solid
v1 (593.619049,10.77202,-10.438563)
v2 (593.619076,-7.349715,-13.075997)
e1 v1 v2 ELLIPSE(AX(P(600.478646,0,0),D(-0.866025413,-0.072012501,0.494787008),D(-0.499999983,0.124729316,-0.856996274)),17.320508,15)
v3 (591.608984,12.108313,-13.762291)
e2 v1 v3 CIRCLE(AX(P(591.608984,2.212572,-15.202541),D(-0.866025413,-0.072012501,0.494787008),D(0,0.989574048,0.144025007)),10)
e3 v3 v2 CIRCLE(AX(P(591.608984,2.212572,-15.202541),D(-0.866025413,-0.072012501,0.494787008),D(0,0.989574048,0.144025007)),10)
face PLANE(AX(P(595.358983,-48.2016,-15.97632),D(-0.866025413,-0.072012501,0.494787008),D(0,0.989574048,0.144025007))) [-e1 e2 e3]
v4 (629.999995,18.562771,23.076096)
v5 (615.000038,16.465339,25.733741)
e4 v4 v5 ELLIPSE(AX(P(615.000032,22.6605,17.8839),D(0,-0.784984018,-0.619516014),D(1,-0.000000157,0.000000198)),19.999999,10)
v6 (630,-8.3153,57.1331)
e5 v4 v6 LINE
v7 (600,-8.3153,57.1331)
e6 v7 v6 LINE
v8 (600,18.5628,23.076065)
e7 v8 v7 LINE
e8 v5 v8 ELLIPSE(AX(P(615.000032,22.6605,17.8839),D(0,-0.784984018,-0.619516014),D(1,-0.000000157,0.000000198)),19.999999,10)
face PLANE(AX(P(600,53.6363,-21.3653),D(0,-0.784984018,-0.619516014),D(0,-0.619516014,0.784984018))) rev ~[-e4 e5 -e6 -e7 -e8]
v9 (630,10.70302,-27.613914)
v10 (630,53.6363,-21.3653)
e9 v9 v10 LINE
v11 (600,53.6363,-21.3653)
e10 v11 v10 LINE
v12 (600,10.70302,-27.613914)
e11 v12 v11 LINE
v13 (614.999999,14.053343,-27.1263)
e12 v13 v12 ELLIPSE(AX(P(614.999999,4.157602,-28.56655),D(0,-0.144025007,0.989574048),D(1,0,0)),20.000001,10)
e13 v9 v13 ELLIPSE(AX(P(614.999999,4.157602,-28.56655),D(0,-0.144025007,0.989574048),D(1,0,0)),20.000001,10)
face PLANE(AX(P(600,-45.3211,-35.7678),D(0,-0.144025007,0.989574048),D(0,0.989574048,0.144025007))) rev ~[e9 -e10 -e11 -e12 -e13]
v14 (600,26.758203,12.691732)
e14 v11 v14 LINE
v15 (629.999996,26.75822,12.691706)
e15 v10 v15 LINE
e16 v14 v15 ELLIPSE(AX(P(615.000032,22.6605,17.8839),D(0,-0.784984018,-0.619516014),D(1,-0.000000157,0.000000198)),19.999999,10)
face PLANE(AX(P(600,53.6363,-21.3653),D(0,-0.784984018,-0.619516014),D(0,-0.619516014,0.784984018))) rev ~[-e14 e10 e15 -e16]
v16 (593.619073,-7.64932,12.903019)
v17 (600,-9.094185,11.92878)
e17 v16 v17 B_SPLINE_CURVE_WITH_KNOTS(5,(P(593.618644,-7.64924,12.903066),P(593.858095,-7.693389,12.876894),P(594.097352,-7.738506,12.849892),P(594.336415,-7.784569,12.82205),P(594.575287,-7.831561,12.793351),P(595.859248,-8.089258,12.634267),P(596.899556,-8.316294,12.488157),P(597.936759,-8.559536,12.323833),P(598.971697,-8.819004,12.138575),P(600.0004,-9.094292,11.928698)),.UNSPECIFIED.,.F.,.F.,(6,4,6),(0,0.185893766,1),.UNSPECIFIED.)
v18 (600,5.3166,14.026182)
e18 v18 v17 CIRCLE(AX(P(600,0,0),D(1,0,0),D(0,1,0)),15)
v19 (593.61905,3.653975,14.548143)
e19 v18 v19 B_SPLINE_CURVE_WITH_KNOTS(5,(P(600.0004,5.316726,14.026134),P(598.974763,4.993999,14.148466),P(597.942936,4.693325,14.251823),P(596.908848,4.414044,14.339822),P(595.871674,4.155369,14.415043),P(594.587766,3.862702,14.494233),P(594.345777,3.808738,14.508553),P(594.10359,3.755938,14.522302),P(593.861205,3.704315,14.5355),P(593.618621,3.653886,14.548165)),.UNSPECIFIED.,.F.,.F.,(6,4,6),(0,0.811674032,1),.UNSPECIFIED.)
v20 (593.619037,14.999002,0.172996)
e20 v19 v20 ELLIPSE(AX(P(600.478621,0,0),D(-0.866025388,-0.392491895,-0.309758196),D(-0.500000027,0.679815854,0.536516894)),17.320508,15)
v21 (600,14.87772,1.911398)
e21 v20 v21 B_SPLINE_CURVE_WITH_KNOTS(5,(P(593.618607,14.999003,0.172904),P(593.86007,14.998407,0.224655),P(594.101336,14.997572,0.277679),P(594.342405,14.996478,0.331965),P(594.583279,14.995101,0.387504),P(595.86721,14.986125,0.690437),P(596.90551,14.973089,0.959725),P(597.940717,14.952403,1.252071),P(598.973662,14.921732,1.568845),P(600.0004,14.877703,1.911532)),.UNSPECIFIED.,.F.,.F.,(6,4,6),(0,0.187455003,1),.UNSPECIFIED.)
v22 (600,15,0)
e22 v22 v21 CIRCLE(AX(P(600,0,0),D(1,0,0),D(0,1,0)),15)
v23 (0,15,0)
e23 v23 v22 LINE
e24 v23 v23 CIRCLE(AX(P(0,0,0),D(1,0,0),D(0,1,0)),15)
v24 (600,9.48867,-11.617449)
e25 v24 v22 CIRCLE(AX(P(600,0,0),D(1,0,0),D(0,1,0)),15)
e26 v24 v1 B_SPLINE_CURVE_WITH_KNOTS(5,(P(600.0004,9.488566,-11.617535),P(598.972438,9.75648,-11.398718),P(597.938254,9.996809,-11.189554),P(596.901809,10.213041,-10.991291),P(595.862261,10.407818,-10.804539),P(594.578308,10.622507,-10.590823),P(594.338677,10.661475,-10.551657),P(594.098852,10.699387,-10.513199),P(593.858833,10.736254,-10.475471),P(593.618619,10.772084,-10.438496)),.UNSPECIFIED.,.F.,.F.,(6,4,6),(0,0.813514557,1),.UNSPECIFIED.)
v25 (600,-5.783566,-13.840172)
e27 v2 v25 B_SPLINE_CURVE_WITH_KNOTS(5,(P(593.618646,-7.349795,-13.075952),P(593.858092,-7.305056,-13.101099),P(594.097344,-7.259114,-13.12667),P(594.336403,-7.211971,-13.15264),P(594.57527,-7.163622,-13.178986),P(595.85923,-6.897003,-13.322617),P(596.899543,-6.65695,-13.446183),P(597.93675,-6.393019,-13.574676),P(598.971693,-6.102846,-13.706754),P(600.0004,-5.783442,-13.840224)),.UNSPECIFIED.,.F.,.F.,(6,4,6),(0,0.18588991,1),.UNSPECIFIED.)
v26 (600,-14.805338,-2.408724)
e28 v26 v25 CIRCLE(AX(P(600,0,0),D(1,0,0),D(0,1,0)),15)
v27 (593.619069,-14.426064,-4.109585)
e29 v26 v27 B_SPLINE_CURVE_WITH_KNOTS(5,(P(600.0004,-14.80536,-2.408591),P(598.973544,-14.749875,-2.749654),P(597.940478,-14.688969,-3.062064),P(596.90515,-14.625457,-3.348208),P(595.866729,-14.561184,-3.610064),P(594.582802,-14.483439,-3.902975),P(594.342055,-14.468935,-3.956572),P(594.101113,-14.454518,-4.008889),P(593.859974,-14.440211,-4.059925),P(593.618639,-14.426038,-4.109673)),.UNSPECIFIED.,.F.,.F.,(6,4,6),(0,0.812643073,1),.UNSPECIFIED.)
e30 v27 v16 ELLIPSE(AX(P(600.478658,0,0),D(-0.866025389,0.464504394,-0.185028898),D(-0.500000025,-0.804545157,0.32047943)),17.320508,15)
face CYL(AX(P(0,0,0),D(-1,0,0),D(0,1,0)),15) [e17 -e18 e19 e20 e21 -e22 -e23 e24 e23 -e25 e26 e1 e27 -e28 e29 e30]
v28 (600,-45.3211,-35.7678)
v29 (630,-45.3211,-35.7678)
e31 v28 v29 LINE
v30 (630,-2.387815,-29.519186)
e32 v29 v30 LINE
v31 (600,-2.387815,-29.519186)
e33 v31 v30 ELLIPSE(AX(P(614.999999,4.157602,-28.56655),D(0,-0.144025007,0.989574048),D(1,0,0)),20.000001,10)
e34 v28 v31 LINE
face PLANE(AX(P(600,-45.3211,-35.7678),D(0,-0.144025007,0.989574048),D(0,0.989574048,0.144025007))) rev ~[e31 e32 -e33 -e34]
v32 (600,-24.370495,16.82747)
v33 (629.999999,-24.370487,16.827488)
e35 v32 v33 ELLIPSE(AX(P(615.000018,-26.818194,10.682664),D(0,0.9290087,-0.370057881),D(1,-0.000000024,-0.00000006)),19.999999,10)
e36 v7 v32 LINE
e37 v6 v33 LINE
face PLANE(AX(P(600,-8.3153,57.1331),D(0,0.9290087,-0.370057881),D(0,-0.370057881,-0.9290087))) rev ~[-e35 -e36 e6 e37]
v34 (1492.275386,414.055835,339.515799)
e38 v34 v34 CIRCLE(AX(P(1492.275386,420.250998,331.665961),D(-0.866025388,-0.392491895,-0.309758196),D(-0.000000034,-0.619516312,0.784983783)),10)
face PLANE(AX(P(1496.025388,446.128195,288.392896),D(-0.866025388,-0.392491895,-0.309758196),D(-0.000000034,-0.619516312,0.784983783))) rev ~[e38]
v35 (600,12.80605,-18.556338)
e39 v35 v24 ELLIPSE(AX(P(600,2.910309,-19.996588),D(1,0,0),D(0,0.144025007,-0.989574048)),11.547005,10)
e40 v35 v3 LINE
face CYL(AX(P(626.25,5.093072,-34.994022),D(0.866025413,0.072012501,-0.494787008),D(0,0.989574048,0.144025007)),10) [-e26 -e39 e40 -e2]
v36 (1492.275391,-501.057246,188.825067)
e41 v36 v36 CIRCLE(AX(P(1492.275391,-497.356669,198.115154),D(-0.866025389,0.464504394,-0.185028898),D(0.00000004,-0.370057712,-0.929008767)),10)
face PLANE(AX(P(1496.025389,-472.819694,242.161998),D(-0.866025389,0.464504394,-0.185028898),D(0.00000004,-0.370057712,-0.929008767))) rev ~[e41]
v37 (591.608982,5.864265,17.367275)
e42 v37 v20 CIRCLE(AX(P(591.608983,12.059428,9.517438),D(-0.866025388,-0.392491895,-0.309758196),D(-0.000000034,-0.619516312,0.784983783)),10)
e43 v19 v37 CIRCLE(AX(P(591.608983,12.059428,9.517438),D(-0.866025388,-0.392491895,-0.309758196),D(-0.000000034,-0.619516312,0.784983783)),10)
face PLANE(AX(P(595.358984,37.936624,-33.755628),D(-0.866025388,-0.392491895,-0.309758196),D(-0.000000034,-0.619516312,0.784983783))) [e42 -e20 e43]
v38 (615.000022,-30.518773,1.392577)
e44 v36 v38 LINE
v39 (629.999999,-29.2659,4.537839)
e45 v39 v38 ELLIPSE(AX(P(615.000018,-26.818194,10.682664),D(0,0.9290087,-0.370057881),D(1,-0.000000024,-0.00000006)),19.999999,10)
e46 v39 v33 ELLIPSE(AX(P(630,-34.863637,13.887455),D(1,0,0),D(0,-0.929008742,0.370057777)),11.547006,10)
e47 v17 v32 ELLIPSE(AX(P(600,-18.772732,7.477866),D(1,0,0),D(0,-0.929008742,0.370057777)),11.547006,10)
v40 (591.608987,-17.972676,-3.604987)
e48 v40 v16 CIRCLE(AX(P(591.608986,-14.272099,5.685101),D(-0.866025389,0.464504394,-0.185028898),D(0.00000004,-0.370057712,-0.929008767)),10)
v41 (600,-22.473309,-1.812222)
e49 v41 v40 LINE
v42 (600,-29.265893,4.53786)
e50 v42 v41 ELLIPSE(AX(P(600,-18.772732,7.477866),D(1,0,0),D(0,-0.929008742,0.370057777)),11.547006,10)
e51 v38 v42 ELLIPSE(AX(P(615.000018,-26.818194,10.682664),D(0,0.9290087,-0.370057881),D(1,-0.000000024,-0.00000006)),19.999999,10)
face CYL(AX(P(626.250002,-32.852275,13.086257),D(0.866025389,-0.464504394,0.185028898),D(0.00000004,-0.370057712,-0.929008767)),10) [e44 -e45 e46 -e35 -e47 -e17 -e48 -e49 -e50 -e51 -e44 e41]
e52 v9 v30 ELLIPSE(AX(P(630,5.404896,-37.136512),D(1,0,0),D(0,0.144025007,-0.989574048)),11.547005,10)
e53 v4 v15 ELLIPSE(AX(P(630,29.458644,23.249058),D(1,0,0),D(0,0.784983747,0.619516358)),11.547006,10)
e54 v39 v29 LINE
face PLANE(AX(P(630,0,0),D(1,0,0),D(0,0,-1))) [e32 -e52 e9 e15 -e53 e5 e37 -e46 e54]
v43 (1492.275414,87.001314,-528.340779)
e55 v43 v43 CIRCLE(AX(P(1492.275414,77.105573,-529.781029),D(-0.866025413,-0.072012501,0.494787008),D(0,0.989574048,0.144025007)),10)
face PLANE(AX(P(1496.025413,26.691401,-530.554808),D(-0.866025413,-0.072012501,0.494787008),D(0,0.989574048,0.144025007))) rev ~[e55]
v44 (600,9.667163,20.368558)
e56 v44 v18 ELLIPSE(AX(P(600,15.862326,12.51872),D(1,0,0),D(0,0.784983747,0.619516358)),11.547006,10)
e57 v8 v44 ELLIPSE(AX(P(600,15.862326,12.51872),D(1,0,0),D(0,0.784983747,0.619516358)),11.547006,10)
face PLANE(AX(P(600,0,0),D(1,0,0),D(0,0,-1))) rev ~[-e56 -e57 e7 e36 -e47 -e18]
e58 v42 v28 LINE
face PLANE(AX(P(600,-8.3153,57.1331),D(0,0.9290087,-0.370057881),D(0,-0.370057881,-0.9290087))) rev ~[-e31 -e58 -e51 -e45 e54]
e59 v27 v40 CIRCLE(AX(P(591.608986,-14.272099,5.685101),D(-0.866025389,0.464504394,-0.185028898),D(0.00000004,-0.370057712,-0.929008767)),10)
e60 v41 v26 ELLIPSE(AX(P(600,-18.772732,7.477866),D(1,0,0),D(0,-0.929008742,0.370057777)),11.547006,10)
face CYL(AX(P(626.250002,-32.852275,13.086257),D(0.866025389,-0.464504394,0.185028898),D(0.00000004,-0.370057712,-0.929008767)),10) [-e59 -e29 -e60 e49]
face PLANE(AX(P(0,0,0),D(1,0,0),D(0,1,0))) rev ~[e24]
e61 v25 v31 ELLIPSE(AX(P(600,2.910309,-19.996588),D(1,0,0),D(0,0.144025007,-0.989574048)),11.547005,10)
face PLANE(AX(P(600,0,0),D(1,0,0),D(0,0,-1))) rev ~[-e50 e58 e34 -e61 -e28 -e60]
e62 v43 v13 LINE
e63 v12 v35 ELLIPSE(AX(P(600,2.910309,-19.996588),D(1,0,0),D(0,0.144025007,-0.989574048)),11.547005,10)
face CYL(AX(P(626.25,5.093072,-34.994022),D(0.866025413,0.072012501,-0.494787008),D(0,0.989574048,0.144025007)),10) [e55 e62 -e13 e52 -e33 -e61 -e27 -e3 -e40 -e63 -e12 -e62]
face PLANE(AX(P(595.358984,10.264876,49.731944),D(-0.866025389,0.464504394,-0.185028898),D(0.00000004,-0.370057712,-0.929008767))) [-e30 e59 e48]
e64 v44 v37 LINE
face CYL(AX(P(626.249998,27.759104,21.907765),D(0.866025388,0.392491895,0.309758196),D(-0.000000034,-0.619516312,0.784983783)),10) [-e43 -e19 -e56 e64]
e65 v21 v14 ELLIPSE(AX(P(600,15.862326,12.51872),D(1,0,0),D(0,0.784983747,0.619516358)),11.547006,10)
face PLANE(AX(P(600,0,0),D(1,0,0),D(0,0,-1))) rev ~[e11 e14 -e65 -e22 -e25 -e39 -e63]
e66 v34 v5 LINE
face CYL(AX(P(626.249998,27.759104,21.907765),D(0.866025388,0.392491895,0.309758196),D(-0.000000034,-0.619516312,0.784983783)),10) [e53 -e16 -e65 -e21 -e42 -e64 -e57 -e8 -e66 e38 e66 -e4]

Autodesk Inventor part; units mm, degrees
sketch "Esquisse2" plane through (0, 0, 0) normal (1, 0, 0) x (0, 1, 0)
  circle A0 centre (0, 0) radius 15
  dimension "d3" = 30
extrude "Extrusion1" add sketch "Esquisse2" along normal blind 600
sketch "Esquisse3" plane through (600, 0, 0) normal (1, 0, 0) x (0, 0, -1)
  circle A0 centre (0, 0) radius 15 construction
  line L0 (35.7678, -45.3211) -> (21.3653, 53.6363)
  line L1 (21.3653, 53.6363) -> (-57.1331, -8.3153)
  line L2 (-57.1331, -8.3153) -> (35.7678, -45.3211)
  line L3 (54.348, 0) -> (-75.7133, 0) construction
  dimension "d12" = 60
  dimension "d13" = 60
  dimension "d14" = 60
  dimension "d16" = 100
  dimension "d17" = 86.6025
  dimension "d18" = 28.8675
  dimension "d19" = 28.8675
  dimension "d20" = 28.8675
  dimension "d21" = 38.281
extrude "Extrusion2" add sketch "Esquisse3" along normal blind 30
ref_plane "Plan de construction1" through (630, -8.3153, 57.1331) normal (-0.8660254, 0.4645044, -0.1850289) x (0, -0.3700577, -0.9290088)
ref_plane "Plan de construction2" through (630, -45.3211, -35.7678) normal (-0.8660254, -0.0720125, 0.494787) x (0, 0.989574, 0.144025)
ref_plane "Plan de construction3" through (630, 53.6363, -21.3653) normal (-0.8660254, -0.3924919, -0.3097582) x (0, -0.6195163, 0.7849838)
sketch "Esquisse4" plane through (630, -45.3211, -35.7678) normal (-0.8660254, -0.0720125, 0.494787) x (0, 0.989574, 0.144025)
  line L0 (0, 15) -> (100, 15) construction
  line L1 (100, 15) -> (100, 0) construction
  line L2 (0, 0) -> (100, 0) construction
  line L3 (0, 15) -> (0, 0) construction
  circle A0 centre (50, 7.5) radius 10
  line L4 (50, 753.3118) -> (50, -218.5479) construction
  point P0 (50, 290)
  dimension "d25" = 20
  dimension "d26" = 15
  dimension "d27" = 7.5
extrude "Extrusion3" add sketch "Esquisse4" along normal blind 40 and the other way blind 1000
sketch "Esquisse5" plane through (630, 53.6363, -21.3653) normal (-0.8660254, -0.3924919, -0.3097582) x (0, -0.6195163, 0.7849838)
  line L0 (0, 15) -> (100, 15) construction
  line L1 (100, 15) -> (100, 0) construction
  line L2 (0, 0) -> (100, 0) construction
  line L3 (0, 15) -> (0, 0) construction
  circle A0 centre (50, 7.5) radius 10
  line L4 (50, 845.2082) -> (50, -1048.939) construction
  point P0 (50, 290)
  dimension "d32" = 20
  dimension "d33" = 7.5
extrude "Extrusion4" add sketch "Esquisse5" along normal blind 40 and the other way blind 1000
sketch "Esquisse6" plane through (630, -8.3153, 57.1331) normal (-0.8660254, 0.4645044, -0.1850289) x (0, -0.3700577, -0.9290088)
  line L0 (0, 15) -> (100, 15) construction
  line L1 (100, 15) -> (100, 0) construction
  line L2 (0, 0) -> (100, 0) construction
  line L3 (0, 15) -> (0, 0) construction
  circle A0 centre (50, 7.5) radius 10
  line L4 (50, 943.564) -> (50, -1296.7643) construction
  point P0 (50, 290)
  dimension "d38" = 20
  dimension "d39" = 7.5
extrude "Extrusion5" add sketch "Esquisse6" along normal blind 40 and the other way blind 1000
equation "\"d18\" = 0.333333 * d17"
equation "\"d19\" = 0.333333 * d17"
equation "\"d27\" = 0.5 * d26"
properties part number "P003_tripod"
